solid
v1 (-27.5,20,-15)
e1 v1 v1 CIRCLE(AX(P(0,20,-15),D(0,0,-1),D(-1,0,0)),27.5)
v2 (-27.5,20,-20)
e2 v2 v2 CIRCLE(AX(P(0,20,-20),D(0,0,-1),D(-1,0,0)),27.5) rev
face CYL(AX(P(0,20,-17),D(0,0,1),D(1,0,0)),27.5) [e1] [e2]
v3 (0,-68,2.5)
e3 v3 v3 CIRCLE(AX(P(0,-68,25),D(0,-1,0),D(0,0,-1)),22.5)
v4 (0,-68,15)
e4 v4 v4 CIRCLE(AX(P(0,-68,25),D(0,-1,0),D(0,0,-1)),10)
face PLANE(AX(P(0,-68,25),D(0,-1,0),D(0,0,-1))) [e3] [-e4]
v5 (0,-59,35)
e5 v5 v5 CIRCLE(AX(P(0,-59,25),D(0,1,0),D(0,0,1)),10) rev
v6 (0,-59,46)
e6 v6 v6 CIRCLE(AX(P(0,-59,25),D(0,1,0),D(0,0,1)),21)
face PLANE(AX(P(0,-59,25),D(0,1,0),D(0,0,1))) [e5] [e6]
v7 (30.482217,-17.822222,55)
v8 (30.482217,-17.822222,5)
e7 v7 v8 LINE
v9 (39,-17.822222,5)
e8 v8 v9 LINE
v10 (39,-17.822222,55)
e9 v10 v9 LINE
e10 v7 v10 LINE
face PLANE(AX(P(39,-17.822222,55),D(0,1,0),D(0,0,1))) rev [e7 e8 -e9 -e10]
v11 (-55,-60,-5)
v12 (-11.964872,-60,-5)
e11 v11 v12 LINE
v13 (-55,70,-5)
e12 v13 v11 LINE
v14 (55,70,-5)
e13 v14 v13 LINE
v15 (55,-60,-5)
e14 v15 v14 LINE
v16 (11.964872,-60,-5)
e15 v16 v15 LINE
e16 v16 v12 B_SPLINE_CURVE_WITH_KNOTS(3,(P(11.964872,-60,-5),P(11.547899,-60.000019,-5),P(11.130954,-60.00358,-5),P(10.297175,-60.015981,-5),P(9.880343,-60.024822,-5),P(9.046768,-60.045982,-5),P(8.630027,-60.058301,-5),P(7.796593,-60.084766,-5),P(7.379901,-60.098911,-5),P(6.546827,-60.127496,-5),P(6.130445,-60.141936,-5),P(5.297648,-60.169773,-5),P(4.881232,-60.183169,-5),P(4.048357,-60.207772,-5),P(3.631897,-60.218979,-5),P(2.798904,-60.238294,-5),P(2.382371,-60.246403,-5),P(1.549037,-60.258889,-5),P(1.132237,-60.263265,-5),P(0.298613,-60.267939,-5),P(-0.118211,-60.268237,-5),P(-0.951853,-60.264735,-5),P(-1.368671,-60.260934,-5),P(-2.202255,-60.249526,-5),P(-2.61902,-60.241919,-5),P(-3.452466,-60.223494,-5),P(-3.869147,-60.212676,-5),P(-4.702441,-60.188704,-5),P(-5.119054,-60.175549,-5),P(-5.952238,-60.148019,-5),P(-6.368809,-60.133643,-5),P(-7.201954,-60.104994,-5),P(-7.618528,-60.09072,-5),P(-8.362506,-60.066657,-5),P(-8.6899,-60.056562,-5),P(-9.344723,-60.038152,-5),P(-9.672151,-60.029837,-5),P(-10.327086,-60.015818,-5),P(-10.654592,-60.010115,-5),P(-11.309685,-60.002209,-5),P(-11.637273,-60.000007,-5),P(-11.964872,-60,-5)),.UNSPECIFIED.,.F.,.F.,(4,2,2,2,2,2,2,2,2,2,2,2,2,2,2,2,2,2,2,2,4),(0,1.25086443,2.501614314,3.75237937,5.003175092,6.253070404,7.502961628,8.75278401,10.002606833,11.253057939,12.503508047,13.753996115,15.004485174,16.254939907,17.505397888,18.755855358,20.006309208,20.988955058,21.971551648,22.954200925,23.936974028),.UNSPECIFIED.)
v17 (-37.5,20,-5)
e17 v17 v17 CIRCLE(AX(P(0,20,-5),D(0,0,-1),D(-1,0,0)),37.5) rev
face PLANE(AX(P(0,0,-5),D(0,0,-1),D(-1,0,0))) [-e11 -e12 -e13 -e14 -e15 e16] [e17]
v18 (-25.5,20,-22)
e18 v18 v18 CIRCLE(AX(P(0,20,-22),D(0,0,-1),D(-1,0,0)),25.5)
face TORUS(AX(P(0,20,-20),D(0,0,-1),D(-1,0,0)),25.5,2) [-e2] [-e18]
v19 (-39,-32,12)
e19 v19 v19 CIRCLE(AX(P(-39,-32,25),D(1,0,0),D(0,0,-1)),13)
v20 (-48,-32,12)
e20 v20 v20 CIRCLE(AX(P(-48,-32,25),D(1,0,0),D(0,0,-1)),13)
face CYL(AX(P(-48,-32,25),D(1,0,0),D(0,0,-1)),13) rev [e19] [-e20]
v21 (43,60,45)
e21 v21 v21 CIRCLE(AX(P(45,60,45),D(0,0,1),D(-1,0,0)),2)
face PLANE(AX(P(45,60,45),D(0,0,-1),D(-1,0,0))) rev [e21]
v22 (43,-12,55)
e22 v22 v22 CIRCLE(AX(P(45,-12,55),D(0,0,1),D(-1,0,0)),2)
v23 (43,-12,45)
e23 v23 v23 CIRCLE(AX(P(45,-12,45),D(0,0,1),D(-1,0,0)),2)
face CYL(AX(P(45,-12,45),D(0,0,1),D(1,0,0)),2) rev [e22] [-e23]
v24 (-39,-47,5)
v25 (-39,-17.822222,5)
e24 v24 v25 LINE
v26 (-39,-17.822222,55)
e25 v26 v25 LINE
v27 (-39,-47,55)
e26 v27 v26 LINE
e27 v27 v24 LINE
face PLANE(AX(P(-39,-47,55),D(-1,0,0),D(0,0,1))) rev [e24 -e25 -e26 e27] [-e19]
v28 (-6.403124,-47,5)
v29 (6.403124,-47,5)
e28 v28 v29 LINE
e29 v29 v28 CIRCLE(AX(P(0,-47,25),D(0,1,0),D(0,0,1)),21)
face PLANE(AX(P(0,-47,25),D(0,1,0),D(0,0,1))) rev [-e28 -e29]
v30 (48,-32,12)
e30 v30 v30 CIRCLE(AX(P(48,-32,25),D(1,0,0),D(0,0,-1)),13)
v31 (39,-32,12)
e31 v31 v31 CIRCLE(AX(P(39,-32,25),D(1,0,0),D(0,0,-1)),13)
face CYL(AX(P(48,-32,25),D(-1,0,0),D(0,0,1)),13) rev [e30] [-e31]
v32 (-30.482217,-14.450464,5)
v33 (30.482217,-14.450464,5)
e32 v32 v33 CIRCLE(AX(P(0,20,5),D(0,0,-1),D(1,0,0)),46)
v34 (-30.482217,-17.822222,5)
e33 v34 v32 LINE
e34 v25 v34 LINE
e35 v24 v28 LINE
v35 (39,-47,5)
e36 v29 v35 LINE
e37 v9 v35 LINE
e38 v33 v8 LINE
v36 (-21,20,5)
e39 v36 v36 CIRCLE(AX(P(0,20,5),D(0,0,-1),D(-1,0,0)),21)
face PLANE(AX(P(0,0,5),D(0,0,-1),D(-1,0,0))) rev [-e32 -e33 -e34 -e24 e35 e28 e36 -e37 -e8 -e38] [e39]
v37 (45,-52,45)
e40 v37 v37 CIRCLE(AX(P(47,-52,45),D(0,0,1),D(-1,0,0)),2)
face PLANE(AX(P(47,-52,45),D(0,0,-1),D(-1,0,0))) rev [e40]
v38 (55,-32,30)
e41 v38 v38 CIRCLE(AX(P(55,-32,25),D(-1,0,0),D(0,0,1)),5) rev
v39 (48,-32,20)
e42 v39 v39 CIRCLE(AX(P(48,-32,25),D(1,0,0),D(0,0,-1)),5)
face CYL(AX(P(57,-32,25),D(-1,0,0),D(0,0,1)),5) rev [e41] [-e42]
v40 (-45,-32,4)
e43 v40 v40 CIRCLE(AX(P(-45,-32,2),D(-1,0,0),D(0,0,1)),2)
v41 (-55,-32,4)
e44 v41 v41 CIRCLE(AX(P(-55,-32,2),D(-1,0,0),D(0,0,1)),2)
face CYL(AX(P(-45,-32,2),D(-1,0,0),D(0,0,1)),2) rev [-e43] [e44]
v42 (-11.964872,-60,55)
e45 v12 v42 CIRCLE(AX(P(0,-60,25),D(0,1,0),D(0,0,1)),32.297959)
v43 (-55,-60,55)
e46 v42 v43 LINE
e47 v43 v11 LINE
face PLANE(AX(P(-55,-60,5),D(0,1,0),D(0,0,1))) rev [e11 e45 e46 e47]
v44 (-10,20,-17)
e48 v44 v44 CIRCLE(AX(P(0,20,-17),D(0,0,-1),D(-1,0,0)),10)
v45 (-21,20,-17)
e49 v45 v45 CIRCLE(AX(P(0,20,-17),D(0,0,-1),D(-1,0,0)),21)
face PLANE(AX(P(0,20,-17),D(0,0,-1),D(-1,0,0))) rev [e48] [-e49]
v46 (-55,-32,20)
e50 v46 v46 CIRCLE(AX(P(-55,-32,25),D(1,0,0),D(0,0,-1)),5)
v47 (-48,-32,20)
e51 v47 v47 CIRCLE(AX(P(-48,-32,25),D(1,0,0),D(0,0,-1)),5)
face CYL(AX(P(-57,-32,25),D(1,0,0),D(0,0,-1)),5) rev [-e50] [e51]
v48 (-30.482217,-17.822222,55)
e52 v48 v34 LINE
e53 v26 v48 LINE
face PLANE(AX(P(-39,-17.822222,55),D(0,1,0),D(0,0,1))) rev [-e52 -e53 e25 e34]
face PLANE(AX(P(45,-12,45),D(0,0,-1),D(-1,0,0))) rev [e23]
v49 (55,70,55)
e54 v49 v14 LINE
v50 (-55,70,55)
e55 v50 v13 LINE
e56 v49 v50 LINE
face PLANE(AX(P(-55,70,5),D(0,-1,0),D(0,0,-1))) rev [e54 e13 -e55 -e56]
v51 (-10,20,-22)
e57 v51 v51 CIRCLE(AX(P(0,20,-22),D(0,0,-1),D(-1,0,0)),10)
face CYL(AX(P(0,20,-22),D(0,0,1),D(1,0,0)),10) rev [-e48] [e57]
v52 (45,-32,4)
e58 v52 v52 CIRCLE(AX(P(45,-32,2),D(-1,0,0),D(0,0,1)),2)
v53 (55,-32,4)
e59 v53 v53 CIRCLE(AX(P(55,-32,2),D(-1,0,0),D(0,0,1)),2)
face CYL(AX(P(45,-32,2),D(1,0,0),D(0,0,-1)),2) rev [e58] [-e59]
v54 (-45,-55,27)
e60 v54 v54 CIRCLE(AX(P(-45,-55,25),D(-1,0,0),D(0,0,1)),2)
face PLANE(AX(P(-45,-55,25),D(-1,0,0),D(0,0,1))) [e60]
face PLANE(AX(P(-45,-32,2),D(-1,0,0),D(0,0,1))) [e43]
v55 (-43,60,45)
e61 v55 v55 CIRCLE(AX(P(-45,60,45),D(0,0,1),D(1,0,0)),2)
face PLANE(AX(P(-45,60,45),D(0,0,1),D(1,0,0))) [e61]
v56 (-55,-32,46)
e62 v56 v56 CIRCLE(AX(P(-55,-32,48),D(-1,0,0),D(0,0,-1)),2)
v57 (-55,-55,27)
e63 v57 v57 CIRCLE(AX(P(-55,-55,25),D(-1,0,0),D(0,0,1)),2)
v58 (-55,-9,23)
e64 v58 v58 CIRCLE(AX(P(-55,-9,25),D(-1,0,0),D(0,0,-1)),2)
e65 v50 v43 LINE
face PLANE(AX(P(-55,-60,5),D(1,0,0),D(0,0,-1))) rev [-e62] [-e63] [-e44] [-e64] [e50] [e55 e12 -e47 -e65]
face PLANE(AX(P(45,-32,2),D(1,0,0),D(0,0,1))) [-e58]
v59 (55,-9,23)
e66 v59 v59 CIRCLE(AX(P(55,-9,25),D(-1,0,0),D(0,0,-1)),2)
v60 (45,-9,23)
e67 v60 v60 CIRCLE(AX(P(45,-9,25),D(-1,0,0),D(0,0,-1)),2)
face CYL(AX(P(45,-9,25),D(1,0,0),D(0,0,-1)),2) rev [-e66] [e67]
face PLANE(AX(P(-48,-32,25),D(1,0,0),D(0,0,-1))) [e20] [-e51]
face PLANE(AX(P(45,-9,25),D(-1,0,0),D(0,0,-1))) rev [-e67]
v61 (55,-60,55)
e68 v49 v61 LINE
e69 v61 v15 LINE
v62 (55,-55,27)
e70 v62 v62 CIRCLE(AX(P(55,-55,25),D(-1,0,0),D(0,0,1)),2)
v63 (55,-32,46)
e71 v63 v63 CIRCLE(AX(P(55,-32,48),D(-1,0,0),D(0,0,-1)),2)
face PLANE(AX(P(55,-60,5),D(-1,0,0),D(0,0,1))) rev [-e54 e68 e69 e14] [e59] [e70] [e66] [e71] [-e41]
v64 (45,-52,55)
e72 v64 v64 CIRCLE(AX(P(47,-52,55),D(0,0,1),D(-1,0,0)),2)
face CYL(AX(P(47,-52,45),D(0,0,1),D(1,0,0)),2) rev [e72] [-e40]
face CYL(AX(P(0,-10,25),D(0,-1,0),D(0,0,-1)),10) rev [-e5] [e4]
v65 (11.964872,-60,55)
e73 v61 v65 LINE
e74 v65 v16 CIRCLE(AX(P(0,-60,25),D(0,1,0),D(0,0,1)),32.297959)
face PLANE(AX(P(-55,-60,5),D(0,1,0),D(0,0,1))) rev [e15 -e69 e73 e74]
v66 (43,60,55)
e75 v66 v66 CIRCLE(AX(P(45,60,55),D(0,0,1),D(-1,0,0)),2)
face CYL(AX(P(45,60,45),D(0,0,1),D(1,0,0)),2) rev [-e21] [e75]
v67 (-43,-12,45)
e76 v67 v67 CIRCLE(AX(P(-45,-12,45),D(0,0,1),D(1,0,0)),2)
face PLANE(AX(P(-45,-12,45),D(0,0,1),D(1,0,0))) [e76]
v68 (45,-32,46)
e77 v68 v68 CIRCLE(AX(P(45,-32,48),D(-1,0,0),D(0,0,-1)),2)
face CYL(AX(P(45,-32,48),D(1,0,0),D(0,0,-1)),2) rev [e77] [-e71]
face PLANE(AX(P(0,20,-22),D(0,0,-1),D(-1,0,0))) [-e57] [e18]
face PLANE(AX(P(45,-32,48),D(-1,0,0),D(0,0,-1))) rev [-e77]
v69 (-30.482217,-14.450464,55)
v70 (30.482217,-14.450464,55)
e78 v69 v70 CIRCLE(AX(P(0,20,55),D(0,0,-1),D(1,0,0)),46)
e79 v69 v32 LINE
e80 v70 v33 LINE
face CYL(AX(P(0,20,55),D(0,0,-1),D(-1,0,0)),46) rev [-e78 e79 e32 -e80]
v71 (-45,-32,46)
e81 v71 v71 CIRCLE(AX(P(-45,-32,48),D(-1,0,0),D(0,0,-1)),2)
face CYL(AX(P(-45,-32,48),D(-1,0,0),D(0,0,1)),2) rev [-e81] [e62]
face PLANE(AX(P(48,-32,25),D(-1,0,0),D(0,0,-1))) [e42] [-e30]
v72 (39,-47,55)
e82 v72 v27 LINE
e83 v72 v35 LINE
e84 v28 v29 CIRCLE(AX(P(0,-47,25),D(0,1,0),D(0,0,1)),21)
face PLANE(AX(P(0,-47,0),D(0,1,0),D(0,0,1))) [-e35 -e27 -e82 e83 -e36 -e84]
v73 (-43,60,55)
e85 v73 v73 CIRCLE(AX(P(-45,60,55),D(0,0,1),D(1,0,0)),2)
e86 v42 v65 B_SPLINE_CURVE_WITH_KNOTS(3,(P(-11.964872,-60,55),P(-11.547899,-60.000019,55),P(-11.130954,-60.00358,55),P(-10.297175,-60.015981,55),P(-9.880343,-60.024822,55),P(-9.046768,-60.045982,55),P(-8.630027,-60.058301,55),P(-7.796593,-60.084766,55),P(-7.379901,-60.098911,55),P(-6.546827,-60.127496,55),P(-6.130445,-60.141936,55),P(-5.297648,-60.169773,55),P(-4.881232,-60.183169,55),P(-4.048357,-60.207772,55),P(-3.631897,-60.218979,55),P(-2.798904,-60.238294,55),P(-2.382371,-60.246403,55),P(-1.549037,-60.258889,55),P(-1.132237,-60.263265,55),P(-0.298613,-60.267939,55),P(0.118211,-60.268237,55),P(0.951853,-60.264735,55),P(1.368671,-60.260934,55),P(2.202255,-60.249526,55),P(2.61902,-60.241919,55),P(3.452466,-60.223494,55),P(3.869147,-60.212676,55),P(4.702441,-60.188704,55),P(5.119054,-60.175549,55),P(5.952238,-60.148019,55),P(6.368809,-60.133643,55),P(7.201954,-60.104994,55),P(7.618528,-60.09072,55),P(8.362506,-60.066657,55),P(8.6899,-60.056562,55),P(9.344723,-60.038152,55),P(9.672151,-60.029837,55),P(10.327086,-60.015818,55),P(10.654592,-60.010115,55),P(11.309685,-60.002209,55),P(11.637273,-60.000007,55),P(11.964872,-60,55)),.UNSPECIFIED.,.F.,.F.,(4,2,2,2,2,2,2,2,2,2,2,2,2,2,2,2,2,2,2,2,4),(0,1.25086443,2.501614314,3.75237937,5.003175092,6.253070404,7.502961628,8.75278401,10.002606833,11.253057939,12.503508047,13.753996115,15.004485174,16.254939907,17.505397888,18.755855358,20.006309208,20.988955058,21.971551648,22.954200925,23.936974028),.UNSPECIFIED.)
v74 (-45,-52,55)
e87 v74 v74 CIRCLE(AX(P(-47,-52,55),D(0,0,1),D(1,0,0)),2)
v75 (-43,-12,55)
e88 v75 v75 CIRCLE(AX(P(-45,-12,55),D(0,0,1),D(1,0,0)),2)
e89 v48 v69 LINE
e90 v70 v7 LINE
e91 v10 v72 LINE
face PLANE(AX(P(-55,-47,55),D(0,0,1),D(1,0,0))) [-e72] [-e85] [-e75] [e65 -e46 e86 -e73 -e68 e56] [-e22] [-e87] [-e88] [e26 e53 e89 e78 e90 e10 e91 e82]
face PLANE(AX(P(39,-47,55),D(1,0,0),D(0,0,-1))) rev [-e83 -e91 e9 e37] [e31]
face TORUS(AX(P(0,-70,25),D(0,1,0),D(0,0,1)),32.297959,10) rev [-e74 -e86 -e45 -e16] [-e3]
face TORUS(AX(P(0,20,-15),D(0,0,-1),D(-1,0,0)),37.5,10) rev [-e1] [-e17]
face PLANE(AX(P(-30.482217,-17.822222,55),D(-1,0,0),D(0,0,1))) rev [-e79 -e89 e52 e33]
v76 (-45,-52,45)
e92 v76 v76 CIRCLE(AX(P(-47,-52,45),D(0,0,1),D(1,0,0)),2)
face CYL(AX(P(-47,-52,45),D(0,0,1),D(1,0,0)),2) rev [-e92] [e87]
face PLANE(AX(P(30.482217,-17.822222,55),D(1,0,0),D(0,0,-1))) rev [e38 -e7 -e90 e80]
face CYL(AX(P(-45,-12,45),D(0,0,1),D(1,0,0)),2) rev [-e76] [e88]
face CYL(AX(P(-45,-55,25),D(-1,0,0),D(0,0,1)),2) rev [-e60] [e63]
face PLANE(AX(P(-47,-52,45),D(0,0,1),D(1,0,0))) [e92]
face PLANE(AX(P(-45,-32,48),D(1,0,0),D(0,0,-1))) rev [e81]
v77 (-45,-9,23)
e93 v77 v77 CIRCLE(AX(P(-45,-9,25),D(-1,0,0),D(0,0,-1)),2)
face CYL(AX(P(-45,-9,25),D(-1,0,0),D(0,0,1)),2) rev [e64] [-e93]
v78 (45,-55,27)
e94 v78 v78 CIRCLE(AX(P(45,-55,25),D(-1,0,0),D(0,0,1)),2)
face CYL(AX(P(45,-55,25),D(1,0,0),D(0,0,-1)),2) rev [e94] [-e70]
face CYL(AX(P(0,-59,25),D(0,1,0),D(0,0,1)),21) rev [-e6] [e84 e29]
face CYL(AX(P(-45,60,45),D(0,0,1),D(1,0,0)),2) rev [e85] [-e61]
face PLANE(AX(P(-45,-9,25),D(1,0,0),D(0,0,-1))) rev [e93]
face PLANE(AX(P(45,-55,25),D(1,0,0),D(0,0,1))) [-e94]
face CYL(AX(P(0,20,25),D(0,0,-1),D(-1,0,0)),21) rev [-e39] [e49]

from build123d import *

# Parameters (mm, degrees)
SKETCH1_W           = 110
SKETCH1_H           = 130
BOSS_EXTRUDE1_DEPTH = 5
SKETCH10_W          = 110
SKETCH10_H          = 60
BOSS_EXTRUDE4_DEPTH = 13
SKETCH6_R           = 21
CUT_EXTRUDE2_DEPTH  = 30
BOSS_EXTRUDE6_START = 12
SKETCH16_R          = 27.5
SKETCH16_R_2        = 21
BOSS_EXTRUDE6_DEPTH = 12
BOSS_EXTRUDE7_START = 5
SKETCH17_R          = 27.5
SKETCH17_R_2        = 10
BOSS_EXTRUDE7_DEPTH = 5
BOSS_EXTRUDE8_DEPTH = 50
SKETCH19_R          = 10
CUT_EXTRUDE3_DEPTH  = 50
SKETCH21_R          = 21
CUT_EXTRUDE4_DEPTH  = 12
BOSS_EXTRUDE9_START = 8
SKETCH22_R          = 22.5
SKETCH22_R_2        = 10
BOSS_EXTRUDE9_DEPTH = 8
FILLET1_R           = 10
FILLET2_R           = 10
FILLET3_R           = 2
SKETCH23_R          = 13
CUT_EXTRUDE5_DEPTH  = 9
SKETCH24_R          = 5
CUT_EXTRUDE6_DEPTH  = 9
SKETCH27_R          = 2
CUT_EXTRUDE7_DEPTH  = 10
SKETCH28_R          = 2
CUT_EXTRUDE8_DEPTH  = 10


with BuildPart() as part:
    # Sketch1 → Boss-Extrude1 (new, symmetric)
    with BuildSketch(Plane.XY):
        with Locations((0, 5)):
            Rectangle(SKETCH1_W, SKETCH1_H)
    extrude(amount=BOSS_EXTRUDE1_DEPTH, both=True)

    # Sketch10 → Boss-Extrude4 (add)
    with BuildSketch(Plane.XZ.offset(60)):
        with Locations((0, 25)):
            Rectangle(SKETCH10_W, SKETCH10_H)
    extrude(amount=-BOSS_EXTRUDE4_DEPTH)

    # Sketch6 → Cut-Extrude2 (cut)
    with BuildSketch(Plane(origin=(0, 0, -5), x_dir=(-1, 0, 0), z_dir=(0, 0, -1))):
        with Locations((0, 20)):
            Circle(SKETCH6_R)
    extrude(amount=-CUT_EXTRUDE2_DEPTH, mode=Mode.SUBTRACT)

    # Sketch16 → Boss-Extrude6 (add)
    with BuildSketch(Plane(origin=(0, 0, -5), x_dir=(-1, 0, 0), z_dir=(0, 0, -1)).offset(BOSS_EXTRUDE6_START)):
        with Locations((0, 20)):
            Circle(SKETCH16_R)
        with Locations((0, 20)):
            Circle(SKETCH16_R_2, mode=Mode.SUBTRACT)
    extrude(amount=-BOSS_EXTRUDE6_DEPTH)

    # Sketch17 → Boss-Extrude7 (add)
    with BuildSketch(Plane(origin=(0, 0, -17), x_dir=(-1, 0, 0), z_dir=(0, 0, -1)).offset(BOSS_EXTRUDE7_START)):
        with Locations((0, 20)):
            Circle(SKETCH17_R)
        with Locations((0, 20)):
            Circle(SKETCH17_R_2, mode=Mode.SUBTRACT)
    extrude(amount=-BOSS_EXTRUDE7_DEPTH)

    # Sketch18 → Boss-Extrude8 (add)
    with BuildSketch(Plane.XY.offset(5)):
        with BuildLine():
            Line((-55, -47), (-39, -47))
            Line((-39, -47), (-39, -17.822222222))
            Line((-39, -17.822222222), (-30.482216757, -17.822222222))
            Line((-30.482216757, -17.822222222), (-30.482216757, -14.450463881))
            ThreePointArc((-30.482216757, -14.450463881), (0, 66), (30.482216757, -14.450463881))
            Line((30.482216757, -14.450463881), (30.482216757, -17.822222222))
            Line((30.482216757, -17.822222222), (39, -17.822222222))
            Line((39, -17.822222222), (39, -47))
            Line((39, -47), (55, -47))
            Line((55, -47), (55, 70))
            Line((55, 70), (-55, 70))
            Line((-55, 70), (-55, -47))
        make_face()
    extrude(amount=BOSS_EXTRUDE8_DEPTH)

    # Sketch19 → Cut-Extrude3 (cut)
    with BuildSketch(Plane.XZ.offset(60)):
        with Locations(Location((0, 25, 0), (0, 0, 270))):
            Circle(SKETCH19_R)
    extrude(amount=-CUT_EXTRUDE3_DEPTH, mode=Mode.SUBTRACT)

    # Sketch21 → Cut-Extrude4 (cut)
    with BuildSketch(Plane(origin=(0, -47, 0), x_dir=(1, 0, 0), z_dir=(0, 1, 0))):
        with Locations(Location((0, -25, 0), (0, 0, 270))):
            Circle(SKETCH21_R)
    extrude(amount=-CUT_EXTRUDE4_DEPTH, mode=Mode.SUBTRACT)

    # Sketch22 → Boss-Extrude9 (add)
    with BuildSketch(Plane.XZ.offset(60).offset(BOSS_EXTRUDE9_START)):
        with Locations(Location((0, 25, 0), (0, 0, 270))):
            Circle(SKETCH22_R)
        with Locations(Location((0, 25, 0), (0, 0, 270))):
            Circle(SKETCH22_R_2, mode=Mode.SUBTRACT)
    extrude(amount=-BOSS_EXTRUDE9_DEPTH)

    # Fillet1
    # the kernel refuses this fillet: 10 mm, written as the material it adds along each edge
    with BuildSketch(Plane(origin=(0, -60, 25), x_dir=(0, 0, -1), z_dir=(-1, 0, 0))) as fillet1_piece_1_section:
        with BuildLine():
            CenterArc((32.297958971, 10), FILLET1_R, 191.536959033, 78.463040967)
            Line((22.5, 8), (22.5, 0))
            Line((22.5, 0), (32.297958971, 0))
        make_face()
    fillet1_piece_1 = revolve(axis=Axis((0, -60, 25), (0, -1, 0)), mode=Mode.PRIVATE)
    fillet1_piece_1 = split(fillet1_piece_1, bisect_by=Plane(origin=(0, -60, 55), z_dir=(0, 0, -1)), keep=Keep.TOP, mode=Mode.PRIVATE)
    fillet1_piece_1 = split(fillet1_piece_1, bisect_by=Plane(origin=(0, -60, -5), z_dir=(0, 0, 1)), keep=Keep.TOP, mode=Mode.PRIVATE)
    add(fillet1_piece_1)

    # Fillet2
    fillet2_edges = [part.edges().sort_by_distance(p)[0] for p in [
        (27.5, 20, -5),
    ]]
    fillet(fillet2_edges, radius=FILLET2_R)

    # Fillet3
    fillet3_edges = [part.edges().sort_by_distance(p)[0] for p in [
        (27.5, 20, -22),
    ]]
    fillet(fillet3_edges, radius=FILLET3_R)

    # Sketch23 → Cut-Extrude5 (cut)
    with BuildSketch(Plane(origin=(-39, 0, 0), x_dir=(0, 0, -1), z_dir=(1, 0, 0))):
        with Locations((-25, -32)):
            Circle(SKETCH23_R)
    cut_extrude5 = extrude(amount=-CUT_EXTRUDE5_DEPTH, mode=Mode.SUBTRACT)

    # Sketch24 → Cut-Extrude6 (cut)
    with BuildSketch(Plane(origin=(-48, 0, 0), x_dir=(0, 0, -1), z_dir=(1, 0, 0))):
        with Locations((-25, -32)):
            Circle(SKETCH24_R)
    cut_extrude6 = extrude(amount=-CUT_EXTRUDE6_DEPTH, mode=Mode.SUBTRACT)

    # Mirror1: Cut-Extrude5, Cut-Extrude6 across plane
    add(cut_extrude5.mirror(Plane(origin=(0, 0, 0), x_dir=(0, 0, 1), z_dir=(1, 0, 0))), mode=Mode.SUBTRACT)
    add(cut_extrude6.mirror(Plane(origin=(0, 0, 0), x_dir=(0, 0, 1), z_dir=(1, 0, 0))), mode=Mode.SUBTRACT)

    # Sketch27 → Cut-Extrude7 (cut)
    with BuildSketch(Plane.ZY.offset(55)):
        with Locations((2, -32)):
            Circle(SKETCH27_R)
        with Locations(Location((48, -32, 0), (0, 0, 180))):
            Circle(SKETCH27_R)
        with Locations((25, -55)):
            Circle(SKETCH27_R)
        with Locations(Location((25, -9, 0), (0, 0, 180))):
            Circle(SKETCH27_R)
    cut_extrude7 = extrude(amount=-CUT_EXTRUDE7_DEPTH, mode=Mode.SUBTRACT)

    # Mirror2: Cut-Extrude7 across plane
    add(cut_extrude7.mirror(Plane(origin=(0, 0, 0), x_dir=(0, 0, 1), z_dir=(1, 0, 0))), mode=Mode.SUBTRACT)

    # Sketch28 → Cut-Extrude8 (cut)
    with BuildSketch(Plane.XY.offset(55)):
        with Locations((-45, 60)):
            Circle(SKETCH28_R)
        with Locations((-45, -12)):
            Circle(SKETCH28_R)
        with Locations((-47, -52)):
            Circle(SKETCH28_R)
        with Locations(Location((47, -52, 0), (0, 0, 180))):
            Circle(SKETCH28_R)
        with Locations(Location((45, -12, 0), (0, 0, 180))):
            Circle(SKETCH28_R)
        with Locations(Location((45, 60, 0), (0, 0, 180))):
            Circle(SKETCH28_R)
    extrude(amount=-CUT_EXTRUDE8_DEPTH, mode=Mode.SUBTRACT)


solid = part.part
